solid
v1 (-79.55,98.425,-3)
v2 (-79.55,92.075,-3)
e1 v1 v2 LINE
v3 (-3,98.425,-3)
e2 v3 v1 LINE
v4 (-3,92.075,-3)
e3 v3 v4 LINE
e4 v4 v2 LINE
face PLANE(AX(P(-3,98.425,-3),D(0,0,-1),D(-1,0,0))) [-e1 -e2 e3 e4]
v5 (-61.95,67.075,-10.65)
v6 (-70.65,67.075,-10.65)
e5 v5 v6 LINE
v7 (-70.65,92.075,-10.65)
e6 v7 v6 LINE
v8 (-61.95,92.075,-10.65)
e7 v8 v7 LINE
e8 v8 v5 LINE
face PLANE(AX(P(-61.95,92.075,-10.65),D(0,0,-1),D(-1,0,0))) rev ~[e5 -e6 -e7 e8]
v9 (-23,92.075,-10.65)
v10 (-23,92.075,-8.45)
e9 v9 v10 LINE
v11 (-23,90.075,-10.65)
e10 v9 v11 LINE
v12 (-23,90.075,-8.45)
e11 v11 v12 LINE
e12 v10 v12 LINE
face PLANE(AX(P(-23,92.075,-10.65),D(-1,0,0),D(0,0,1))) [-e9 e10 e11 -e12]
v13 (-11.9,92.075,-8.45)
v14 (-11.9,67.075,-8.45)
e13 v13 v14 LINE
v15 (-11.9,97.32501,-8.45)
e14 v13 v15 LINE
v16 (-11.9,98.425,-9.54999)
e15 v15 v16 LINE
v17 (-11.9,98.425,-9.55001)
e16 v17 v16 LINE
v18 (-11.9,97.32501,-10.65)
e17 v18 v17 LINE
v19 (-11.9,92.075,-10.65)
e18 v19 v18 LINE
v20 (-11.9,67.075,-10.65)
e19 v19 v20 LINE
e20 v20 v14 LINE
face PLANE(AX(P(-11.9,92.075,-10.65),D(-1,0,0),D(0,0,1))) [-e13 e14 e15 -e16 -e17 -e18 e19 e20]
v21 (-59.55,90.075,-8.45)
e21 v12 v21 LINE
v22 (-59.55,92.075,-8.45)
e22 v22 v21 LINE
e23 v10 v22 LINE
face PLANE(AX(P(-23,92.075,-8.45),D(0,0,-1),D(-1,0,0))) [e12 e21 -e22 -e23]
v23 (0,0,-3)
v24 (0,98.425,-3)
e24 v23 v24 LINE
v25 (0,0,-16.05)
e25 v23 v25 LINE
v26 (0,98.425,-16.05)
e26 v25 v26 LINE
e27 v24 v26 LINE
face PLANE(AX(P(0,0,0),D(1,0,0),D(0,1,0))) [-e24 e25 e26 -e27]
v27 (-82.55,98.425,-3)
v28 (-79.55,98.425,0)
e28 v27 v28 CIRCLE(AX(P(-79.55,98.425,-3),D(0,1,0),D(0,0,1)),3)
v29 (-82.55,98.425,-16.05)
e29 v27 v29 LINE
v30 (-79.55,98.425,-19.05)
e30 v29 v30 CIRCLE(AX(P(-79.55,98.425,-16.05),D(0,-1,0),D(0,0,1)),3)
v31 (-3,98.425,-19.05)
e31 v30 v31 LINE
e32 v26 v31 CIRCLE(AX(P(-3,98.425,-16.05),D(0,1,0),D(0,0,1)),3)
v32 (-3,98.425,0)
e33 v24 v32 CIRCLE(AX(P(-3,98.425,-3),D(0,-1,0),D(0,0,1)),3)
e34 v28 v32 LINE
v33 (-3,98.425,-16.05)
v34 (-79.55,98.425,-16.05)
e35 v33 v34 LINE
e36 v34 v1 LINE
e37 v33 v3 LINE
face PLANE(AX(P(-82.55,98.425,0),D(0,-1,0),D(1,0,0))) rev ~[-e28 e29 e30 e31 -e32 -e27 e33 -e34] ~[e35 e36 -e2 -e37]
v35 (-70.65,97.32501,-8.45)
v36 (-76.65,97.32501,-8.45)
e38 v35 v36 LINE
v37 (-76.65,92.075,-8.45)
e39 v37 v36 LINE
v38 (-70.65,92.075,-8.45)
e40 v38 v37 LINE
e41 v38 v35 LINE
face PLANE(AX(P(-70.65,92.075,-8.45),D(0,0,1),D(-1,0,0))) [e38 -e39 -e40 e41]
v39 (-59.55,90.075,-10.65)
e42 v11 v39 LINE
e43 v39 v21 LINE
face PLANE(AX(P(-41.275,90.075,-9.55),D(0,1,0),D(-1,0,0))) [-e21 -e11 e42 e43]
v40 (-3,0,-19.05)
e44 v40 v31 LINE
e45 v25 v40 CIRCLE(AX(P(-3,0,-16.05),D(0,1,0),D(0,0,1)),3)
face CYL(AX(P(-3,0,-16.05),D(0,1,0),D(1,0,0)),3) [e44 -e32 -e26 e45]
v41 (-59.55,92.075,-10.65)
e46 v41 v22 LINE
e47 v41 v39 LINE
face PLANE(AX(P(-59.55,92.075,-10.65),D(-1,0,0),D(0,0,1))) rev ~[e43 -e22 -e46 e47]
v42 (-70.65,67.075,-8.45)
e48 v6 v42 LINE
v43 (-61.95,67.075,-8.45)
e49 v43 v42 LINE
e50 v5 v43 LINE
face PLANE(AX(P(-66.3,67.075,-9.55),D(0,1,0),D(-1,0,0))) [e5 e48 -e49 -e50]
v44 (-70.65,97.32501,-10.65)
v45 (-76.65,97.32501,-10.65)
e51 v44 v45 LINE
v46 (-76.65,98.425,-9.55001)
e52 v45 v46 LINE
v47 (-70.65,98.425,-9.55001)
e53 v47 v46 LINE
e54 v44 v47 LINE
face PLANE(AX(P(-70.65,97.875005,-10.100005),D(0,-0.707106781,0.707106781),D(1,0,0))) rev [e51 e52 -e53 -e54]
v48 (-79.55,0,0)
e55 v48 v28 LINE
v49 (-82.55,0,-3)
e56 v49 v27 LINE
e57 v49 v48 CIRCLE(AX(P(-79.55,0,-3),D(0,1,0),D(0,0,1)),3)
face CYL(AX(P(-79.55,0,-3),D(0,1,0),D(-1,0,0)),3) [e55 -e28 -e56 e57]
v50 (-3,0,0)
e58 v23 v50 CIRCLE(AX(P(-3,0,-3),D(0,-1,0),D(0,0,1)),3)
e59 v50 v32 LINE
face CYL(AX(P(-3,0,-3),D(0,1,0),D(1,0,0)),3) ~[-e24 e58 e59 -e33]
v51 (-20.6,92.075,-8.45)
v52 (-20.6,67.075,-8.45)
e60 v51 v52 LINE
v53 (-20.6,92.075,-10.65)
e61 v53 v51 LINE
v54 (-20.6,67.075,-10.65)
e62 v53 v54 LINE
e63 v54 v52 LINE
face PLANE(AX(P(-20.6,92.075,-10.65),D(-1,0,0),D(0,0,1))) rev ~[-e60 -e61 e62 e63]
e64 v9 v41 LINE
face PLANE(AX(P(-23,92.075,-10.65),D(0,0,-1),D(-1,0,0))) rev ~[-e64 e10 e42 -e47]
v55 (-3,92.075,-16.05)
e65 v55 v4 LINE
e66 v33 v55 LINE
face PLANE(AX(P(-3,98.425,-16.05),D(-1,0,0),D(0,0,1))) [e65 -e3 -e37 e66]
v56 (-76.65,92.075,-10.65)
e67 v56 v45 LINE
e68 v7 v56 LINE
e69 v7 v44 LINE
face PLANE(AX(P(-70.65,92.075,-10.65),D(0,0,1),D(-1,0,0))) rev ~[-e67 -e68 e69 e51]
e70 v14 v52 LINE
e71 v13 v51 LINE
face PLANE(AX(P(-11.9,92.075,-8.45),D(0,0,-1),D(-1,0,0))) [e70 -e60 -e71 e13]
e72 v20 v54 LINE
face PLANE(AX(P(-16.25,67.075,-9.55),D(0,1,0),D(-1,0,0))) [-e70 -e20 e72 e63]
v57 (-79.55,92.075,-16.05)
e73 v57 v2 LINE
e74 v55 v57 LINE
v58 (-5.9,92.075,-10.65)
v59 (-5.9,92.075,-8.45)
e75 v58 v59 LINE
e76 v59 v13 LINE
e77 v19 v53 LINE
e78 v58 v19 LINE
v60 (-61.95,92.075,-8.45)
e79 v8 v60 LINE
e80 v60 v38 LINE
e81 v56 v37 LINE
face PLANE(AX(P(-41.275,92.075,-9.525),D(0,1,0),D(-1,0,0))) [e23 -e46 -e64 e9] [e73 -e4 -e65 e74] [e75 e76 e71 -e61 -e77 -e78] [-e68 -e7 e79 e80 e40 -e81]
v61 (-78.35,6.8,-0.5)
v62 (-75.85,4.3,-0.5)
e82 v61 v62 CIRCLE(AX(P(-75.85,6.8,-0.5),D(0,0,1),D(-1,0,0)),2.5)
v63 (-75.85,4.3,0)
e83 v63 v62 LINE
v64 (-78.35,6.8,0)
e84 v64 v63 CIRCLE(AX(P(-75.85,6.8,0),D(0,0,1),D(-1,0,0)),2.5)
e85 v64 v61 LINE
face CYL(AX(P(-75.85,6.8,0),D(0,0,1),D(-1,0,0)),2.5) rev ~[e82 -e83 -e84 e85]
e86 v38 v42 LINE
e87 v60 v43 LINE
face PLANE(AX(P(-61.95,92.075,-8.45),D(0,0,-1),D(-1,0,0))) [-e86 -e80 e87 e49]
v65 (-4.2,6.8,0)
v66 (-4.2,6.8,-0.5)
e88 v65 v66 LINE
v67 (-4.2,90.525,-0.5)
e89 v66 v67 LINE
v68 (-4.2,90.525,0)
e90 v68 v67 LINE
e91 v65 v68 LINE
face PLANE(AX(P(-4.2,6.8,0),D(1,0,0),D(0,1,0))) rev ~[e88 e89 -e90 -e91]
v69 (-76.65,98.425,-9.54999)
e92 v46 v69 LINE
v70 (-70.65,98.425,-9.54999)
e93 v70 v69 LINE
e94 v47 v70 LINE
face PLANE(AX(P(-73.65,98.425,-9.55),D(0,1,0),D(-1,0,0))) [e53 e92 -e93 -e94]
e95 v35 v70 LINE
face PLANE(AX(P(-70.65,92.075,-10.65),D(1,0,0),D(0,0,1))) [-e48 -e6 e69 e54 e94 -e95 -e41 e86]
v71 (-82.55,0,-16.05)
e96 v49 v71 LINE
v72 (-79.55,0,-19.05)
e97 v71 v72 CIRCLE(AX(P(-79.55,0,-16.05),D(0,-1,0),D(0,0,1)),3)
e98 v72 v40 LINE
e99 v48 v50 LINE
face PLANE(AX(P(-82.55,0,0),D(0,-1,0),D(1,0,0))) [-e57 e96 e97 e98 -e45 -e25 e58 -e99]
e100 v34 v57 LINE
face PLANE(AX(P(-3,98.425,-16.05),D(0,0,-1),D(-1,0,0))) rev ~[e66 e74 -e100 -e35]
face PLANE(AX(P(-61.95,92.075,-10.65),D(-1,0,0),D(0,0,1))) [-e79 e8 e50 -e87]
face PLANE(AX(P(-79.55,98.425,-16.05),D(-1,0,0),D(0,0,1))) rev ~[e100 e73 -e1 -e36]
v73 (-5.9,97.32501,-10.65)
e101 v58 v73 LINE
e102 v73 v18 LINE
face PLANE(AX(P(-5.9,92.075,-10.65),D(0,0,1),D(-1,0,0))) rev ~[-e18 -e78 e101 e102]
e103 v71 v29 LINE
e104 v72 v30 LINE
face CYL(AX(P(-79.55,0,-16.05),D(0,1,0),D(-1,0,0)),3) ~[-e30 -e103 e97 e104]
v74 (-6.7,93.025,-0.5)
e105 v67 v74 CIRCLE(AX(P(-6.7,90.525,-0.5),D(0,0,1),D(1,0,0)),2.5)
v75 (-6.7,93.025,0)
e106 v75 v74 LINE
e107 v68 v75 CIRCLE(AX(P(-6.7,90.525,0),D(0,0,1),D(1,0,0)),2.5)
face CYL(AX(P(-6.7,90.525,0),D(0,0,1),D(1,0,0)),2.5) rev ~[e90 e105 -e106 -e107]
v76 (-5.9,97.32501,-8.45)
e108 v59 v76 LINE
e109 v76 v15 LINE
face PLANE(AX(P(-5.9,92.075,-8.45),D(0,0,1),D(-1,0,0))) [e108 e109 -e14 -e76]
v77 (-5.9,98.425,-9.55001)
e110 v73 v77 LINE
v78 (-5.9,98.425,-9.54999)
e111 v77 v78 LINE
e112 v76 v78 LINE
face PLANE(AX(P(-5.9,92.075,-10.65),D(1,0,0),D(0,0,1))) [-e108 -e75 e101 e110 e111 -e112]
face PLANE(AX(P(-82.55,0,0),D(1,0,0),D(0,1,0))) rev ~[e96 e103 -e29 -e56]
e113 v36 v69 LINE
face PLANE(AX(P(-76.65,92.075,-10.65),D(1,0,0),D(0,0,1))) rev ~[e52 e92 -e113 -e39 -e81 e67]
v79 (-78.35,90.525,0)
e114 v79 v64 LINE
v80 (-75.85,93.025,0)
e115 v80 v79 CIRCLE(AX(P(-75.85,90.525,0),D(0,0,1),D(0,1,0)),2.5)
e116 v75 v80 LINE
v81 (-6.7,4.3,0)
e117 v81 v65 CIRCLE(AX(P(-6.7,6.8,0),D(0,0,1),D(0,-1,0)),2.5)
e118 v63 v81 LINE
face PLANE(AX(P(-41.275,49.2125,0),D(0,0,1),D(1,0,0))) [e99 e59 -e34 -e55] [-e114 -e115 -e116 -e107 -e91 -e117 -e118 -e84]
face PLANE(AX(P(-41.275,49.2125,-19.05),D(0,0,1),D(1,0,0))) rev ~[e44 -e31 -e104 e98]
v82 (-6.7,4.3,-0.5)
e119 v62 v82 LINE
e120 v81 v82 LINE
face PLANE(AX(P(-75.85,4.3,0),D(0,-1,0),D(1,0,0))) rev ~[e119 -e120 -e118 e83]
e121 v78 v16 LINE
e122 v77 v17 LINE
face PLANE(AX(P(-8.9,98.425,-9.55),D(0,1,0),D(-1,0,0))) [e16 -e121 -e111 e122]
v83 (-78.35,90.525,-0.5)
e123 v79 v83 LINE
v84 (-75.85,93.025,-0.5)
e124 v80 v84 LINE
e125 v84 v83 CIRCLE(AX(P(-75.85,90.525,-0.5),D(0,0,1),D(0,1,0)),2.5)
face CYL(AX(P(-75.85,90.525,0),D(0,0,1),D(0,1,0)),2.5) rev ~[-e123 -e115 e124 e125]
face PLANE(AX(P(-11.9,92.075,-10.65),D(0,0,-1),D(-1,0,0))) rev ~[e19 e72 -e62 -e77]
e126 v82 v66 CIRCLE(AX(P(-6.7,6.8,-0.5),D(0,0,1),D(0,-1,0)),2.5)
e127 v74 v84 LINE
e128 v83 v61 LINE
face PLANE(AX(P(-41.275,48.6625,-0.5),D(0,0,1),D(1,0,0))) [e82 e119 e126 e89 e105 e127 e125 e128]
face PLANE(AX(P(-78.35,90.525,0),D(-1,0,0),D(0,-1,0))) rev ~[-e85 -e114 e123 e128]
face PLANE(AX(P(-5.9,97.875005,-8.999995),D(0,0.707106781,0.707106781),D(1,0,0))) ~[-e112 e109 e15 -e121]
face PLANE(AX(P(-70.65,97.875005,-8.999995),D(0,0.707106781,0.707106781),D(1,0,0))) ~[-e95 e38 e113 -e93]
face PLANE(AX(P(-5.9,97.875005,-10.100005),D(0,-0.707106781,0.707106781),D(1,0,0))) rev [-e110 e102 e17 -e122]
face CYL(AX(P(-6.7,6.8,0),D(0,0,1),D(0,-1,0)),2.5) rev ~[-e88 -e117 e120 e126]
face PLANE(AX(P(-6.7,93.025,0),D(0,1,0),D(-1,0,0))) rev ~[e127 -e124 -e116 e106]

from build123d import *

# Parameters (mm, degrees)
F0_W      = 82.55
F0_H      = 98.425
F2_DEPTH  = 19.05
F3_R      = 3
F4_W      = 76.55
F4_H      = 13.05
F5_DEPTH  = 6.35
F6_W      = 36.55
F6_H      = 2.2
F7_DEPTH  = 2
F8_W      = 8.7
F8_H      = 2.2
F9_DEPTH  = 25
F10_W     = 6
F10_H     = 2.2
F11_DEPTH = 6.35
F12_SIZE  = 1.09999
F14_DEPTH = 0.5


# Not quite as in the source:
# - a fillet or chamfer is up to 0.001 mm smaller than in the source, because OpenCascade refuses the exact size


with BuildPart() as f2:
    # F0 (on Top) → F2 (new body)
    with BuildSketch(Plane.XY):
        with Locations((-41.275, 49.2125)):
            Rectangle(F0_W, F0_H)
    extrude(amount=-F2_DEPTH)

    # F3
    f3_edges = [f2.edges().sort_by_distance(p)[0] for p in [
        (-82.55, 49.2125, -19.05),
        (-82.55, 49.2125, 0),
        (0, 49.2125, 0),
        (0, 49.2125, -19.05),
    ]]
    fillet(f3_edges, radius=F3_R)

    # F4 (on face) → F5 (cut)
    with BuildSketch(Plane(origin=(0, 98.425, 0), x_dir=(-1, 0, 0), z_dir=(0, 1, 0))):
        with Locations((41.275, -9.525)):
            Rectangle(F4_W, F4_H)
    extrude(amount=-F5_DEPTH, mode=Mode.SUBTRACT)

    # F6 (on face) → F7 (cut)
    with BuildSketch(Plane(origin=(0, 92.075, 0), x_dir=(-1, 0, 0), z_dir=(0, 1, 0))):
        with Locations((41.275, -9.55)):
            Rectangle(F6_W, F6_H)
    extrude(amount=-F7_DEPTH, mode=Mode.SUBTRACT)

    # F8 (on face) → F9 (cut)
    with BuildSketch(Plane(origin=(0, 92.075, 0), x_dir=(-1, 0, 0), z_dir=(0, 1, 0))):
        with Locations((66.3, -9.55)):
            Rectangle(F8_W, F8_H)
        with Locations((16.25, -9.55)):
            Rectangle(F8_W, F8_H)
    extrude(amount=-F9_DEPTH, mode=Mode.SUBTRACT)

    # F10 (on face) → F11 (join, through all)
    with BuildSketch(Plane(origin=(0, 92.075, 0), x_dir=(-1, 0, 0), z_dir=(0, 1, 0))):
        with Locations((73.65, -9.55)):
            Rectangle(F10_W, F10_H)
        with Locations((8.9, -9.55)):
            Rectangle(F10_W, F10_H)
    extrude(amount=F11_DEPTH)

    # F12 (size 1.1 in the source; OpenCascade refuses exactly that, so slightly less here)
    f12_edges = [f2.edges().sort_by_distance(p)[0] for p in [
        (-8.9, 98.425, -8.45),
        (-8.9, 98.425, -10.65),
        (-73.65, 98.425, -8.45),
        (-73.65, 98.425, -10.65),
    ]]
    chamfer(f12_edges, length=F12_SIZE)

    # F13 (on face) → F14 (cut)
    with BuildSketch(Plane.XY):
        with BuildLine():
            Line((-6.7, 93.025), (-75.85, 93.025))
            ThreePointArc((-75.85, 93.025), (-77.617766953, 92.292766953), (-78.35, 90.525))
            Line((-78.35, 90.525), (-78.35, 6.8))
            ThreePointArc((-78.35, 6.8), (-77.617766953, 5.032233047), (-75.85, 4.3))
            Line((-75.85, 4.3), (-6.7, 4.3))
            ThreePointArc((-6.7, 4.3), (-4.932233047, 5.032233047), (-4.2, 6.8))
            Line((-4.2, 6.8), (-4.2, 90.525))
            ThreePointArc((-4.2, 90.525), (-4.932233047, 92.292766953), (-6.7, 93.025))
        make_face()
    extrude(amount=-F14_DEPTH, mode=Mode.SUBTRACT)


solid = f2.part
